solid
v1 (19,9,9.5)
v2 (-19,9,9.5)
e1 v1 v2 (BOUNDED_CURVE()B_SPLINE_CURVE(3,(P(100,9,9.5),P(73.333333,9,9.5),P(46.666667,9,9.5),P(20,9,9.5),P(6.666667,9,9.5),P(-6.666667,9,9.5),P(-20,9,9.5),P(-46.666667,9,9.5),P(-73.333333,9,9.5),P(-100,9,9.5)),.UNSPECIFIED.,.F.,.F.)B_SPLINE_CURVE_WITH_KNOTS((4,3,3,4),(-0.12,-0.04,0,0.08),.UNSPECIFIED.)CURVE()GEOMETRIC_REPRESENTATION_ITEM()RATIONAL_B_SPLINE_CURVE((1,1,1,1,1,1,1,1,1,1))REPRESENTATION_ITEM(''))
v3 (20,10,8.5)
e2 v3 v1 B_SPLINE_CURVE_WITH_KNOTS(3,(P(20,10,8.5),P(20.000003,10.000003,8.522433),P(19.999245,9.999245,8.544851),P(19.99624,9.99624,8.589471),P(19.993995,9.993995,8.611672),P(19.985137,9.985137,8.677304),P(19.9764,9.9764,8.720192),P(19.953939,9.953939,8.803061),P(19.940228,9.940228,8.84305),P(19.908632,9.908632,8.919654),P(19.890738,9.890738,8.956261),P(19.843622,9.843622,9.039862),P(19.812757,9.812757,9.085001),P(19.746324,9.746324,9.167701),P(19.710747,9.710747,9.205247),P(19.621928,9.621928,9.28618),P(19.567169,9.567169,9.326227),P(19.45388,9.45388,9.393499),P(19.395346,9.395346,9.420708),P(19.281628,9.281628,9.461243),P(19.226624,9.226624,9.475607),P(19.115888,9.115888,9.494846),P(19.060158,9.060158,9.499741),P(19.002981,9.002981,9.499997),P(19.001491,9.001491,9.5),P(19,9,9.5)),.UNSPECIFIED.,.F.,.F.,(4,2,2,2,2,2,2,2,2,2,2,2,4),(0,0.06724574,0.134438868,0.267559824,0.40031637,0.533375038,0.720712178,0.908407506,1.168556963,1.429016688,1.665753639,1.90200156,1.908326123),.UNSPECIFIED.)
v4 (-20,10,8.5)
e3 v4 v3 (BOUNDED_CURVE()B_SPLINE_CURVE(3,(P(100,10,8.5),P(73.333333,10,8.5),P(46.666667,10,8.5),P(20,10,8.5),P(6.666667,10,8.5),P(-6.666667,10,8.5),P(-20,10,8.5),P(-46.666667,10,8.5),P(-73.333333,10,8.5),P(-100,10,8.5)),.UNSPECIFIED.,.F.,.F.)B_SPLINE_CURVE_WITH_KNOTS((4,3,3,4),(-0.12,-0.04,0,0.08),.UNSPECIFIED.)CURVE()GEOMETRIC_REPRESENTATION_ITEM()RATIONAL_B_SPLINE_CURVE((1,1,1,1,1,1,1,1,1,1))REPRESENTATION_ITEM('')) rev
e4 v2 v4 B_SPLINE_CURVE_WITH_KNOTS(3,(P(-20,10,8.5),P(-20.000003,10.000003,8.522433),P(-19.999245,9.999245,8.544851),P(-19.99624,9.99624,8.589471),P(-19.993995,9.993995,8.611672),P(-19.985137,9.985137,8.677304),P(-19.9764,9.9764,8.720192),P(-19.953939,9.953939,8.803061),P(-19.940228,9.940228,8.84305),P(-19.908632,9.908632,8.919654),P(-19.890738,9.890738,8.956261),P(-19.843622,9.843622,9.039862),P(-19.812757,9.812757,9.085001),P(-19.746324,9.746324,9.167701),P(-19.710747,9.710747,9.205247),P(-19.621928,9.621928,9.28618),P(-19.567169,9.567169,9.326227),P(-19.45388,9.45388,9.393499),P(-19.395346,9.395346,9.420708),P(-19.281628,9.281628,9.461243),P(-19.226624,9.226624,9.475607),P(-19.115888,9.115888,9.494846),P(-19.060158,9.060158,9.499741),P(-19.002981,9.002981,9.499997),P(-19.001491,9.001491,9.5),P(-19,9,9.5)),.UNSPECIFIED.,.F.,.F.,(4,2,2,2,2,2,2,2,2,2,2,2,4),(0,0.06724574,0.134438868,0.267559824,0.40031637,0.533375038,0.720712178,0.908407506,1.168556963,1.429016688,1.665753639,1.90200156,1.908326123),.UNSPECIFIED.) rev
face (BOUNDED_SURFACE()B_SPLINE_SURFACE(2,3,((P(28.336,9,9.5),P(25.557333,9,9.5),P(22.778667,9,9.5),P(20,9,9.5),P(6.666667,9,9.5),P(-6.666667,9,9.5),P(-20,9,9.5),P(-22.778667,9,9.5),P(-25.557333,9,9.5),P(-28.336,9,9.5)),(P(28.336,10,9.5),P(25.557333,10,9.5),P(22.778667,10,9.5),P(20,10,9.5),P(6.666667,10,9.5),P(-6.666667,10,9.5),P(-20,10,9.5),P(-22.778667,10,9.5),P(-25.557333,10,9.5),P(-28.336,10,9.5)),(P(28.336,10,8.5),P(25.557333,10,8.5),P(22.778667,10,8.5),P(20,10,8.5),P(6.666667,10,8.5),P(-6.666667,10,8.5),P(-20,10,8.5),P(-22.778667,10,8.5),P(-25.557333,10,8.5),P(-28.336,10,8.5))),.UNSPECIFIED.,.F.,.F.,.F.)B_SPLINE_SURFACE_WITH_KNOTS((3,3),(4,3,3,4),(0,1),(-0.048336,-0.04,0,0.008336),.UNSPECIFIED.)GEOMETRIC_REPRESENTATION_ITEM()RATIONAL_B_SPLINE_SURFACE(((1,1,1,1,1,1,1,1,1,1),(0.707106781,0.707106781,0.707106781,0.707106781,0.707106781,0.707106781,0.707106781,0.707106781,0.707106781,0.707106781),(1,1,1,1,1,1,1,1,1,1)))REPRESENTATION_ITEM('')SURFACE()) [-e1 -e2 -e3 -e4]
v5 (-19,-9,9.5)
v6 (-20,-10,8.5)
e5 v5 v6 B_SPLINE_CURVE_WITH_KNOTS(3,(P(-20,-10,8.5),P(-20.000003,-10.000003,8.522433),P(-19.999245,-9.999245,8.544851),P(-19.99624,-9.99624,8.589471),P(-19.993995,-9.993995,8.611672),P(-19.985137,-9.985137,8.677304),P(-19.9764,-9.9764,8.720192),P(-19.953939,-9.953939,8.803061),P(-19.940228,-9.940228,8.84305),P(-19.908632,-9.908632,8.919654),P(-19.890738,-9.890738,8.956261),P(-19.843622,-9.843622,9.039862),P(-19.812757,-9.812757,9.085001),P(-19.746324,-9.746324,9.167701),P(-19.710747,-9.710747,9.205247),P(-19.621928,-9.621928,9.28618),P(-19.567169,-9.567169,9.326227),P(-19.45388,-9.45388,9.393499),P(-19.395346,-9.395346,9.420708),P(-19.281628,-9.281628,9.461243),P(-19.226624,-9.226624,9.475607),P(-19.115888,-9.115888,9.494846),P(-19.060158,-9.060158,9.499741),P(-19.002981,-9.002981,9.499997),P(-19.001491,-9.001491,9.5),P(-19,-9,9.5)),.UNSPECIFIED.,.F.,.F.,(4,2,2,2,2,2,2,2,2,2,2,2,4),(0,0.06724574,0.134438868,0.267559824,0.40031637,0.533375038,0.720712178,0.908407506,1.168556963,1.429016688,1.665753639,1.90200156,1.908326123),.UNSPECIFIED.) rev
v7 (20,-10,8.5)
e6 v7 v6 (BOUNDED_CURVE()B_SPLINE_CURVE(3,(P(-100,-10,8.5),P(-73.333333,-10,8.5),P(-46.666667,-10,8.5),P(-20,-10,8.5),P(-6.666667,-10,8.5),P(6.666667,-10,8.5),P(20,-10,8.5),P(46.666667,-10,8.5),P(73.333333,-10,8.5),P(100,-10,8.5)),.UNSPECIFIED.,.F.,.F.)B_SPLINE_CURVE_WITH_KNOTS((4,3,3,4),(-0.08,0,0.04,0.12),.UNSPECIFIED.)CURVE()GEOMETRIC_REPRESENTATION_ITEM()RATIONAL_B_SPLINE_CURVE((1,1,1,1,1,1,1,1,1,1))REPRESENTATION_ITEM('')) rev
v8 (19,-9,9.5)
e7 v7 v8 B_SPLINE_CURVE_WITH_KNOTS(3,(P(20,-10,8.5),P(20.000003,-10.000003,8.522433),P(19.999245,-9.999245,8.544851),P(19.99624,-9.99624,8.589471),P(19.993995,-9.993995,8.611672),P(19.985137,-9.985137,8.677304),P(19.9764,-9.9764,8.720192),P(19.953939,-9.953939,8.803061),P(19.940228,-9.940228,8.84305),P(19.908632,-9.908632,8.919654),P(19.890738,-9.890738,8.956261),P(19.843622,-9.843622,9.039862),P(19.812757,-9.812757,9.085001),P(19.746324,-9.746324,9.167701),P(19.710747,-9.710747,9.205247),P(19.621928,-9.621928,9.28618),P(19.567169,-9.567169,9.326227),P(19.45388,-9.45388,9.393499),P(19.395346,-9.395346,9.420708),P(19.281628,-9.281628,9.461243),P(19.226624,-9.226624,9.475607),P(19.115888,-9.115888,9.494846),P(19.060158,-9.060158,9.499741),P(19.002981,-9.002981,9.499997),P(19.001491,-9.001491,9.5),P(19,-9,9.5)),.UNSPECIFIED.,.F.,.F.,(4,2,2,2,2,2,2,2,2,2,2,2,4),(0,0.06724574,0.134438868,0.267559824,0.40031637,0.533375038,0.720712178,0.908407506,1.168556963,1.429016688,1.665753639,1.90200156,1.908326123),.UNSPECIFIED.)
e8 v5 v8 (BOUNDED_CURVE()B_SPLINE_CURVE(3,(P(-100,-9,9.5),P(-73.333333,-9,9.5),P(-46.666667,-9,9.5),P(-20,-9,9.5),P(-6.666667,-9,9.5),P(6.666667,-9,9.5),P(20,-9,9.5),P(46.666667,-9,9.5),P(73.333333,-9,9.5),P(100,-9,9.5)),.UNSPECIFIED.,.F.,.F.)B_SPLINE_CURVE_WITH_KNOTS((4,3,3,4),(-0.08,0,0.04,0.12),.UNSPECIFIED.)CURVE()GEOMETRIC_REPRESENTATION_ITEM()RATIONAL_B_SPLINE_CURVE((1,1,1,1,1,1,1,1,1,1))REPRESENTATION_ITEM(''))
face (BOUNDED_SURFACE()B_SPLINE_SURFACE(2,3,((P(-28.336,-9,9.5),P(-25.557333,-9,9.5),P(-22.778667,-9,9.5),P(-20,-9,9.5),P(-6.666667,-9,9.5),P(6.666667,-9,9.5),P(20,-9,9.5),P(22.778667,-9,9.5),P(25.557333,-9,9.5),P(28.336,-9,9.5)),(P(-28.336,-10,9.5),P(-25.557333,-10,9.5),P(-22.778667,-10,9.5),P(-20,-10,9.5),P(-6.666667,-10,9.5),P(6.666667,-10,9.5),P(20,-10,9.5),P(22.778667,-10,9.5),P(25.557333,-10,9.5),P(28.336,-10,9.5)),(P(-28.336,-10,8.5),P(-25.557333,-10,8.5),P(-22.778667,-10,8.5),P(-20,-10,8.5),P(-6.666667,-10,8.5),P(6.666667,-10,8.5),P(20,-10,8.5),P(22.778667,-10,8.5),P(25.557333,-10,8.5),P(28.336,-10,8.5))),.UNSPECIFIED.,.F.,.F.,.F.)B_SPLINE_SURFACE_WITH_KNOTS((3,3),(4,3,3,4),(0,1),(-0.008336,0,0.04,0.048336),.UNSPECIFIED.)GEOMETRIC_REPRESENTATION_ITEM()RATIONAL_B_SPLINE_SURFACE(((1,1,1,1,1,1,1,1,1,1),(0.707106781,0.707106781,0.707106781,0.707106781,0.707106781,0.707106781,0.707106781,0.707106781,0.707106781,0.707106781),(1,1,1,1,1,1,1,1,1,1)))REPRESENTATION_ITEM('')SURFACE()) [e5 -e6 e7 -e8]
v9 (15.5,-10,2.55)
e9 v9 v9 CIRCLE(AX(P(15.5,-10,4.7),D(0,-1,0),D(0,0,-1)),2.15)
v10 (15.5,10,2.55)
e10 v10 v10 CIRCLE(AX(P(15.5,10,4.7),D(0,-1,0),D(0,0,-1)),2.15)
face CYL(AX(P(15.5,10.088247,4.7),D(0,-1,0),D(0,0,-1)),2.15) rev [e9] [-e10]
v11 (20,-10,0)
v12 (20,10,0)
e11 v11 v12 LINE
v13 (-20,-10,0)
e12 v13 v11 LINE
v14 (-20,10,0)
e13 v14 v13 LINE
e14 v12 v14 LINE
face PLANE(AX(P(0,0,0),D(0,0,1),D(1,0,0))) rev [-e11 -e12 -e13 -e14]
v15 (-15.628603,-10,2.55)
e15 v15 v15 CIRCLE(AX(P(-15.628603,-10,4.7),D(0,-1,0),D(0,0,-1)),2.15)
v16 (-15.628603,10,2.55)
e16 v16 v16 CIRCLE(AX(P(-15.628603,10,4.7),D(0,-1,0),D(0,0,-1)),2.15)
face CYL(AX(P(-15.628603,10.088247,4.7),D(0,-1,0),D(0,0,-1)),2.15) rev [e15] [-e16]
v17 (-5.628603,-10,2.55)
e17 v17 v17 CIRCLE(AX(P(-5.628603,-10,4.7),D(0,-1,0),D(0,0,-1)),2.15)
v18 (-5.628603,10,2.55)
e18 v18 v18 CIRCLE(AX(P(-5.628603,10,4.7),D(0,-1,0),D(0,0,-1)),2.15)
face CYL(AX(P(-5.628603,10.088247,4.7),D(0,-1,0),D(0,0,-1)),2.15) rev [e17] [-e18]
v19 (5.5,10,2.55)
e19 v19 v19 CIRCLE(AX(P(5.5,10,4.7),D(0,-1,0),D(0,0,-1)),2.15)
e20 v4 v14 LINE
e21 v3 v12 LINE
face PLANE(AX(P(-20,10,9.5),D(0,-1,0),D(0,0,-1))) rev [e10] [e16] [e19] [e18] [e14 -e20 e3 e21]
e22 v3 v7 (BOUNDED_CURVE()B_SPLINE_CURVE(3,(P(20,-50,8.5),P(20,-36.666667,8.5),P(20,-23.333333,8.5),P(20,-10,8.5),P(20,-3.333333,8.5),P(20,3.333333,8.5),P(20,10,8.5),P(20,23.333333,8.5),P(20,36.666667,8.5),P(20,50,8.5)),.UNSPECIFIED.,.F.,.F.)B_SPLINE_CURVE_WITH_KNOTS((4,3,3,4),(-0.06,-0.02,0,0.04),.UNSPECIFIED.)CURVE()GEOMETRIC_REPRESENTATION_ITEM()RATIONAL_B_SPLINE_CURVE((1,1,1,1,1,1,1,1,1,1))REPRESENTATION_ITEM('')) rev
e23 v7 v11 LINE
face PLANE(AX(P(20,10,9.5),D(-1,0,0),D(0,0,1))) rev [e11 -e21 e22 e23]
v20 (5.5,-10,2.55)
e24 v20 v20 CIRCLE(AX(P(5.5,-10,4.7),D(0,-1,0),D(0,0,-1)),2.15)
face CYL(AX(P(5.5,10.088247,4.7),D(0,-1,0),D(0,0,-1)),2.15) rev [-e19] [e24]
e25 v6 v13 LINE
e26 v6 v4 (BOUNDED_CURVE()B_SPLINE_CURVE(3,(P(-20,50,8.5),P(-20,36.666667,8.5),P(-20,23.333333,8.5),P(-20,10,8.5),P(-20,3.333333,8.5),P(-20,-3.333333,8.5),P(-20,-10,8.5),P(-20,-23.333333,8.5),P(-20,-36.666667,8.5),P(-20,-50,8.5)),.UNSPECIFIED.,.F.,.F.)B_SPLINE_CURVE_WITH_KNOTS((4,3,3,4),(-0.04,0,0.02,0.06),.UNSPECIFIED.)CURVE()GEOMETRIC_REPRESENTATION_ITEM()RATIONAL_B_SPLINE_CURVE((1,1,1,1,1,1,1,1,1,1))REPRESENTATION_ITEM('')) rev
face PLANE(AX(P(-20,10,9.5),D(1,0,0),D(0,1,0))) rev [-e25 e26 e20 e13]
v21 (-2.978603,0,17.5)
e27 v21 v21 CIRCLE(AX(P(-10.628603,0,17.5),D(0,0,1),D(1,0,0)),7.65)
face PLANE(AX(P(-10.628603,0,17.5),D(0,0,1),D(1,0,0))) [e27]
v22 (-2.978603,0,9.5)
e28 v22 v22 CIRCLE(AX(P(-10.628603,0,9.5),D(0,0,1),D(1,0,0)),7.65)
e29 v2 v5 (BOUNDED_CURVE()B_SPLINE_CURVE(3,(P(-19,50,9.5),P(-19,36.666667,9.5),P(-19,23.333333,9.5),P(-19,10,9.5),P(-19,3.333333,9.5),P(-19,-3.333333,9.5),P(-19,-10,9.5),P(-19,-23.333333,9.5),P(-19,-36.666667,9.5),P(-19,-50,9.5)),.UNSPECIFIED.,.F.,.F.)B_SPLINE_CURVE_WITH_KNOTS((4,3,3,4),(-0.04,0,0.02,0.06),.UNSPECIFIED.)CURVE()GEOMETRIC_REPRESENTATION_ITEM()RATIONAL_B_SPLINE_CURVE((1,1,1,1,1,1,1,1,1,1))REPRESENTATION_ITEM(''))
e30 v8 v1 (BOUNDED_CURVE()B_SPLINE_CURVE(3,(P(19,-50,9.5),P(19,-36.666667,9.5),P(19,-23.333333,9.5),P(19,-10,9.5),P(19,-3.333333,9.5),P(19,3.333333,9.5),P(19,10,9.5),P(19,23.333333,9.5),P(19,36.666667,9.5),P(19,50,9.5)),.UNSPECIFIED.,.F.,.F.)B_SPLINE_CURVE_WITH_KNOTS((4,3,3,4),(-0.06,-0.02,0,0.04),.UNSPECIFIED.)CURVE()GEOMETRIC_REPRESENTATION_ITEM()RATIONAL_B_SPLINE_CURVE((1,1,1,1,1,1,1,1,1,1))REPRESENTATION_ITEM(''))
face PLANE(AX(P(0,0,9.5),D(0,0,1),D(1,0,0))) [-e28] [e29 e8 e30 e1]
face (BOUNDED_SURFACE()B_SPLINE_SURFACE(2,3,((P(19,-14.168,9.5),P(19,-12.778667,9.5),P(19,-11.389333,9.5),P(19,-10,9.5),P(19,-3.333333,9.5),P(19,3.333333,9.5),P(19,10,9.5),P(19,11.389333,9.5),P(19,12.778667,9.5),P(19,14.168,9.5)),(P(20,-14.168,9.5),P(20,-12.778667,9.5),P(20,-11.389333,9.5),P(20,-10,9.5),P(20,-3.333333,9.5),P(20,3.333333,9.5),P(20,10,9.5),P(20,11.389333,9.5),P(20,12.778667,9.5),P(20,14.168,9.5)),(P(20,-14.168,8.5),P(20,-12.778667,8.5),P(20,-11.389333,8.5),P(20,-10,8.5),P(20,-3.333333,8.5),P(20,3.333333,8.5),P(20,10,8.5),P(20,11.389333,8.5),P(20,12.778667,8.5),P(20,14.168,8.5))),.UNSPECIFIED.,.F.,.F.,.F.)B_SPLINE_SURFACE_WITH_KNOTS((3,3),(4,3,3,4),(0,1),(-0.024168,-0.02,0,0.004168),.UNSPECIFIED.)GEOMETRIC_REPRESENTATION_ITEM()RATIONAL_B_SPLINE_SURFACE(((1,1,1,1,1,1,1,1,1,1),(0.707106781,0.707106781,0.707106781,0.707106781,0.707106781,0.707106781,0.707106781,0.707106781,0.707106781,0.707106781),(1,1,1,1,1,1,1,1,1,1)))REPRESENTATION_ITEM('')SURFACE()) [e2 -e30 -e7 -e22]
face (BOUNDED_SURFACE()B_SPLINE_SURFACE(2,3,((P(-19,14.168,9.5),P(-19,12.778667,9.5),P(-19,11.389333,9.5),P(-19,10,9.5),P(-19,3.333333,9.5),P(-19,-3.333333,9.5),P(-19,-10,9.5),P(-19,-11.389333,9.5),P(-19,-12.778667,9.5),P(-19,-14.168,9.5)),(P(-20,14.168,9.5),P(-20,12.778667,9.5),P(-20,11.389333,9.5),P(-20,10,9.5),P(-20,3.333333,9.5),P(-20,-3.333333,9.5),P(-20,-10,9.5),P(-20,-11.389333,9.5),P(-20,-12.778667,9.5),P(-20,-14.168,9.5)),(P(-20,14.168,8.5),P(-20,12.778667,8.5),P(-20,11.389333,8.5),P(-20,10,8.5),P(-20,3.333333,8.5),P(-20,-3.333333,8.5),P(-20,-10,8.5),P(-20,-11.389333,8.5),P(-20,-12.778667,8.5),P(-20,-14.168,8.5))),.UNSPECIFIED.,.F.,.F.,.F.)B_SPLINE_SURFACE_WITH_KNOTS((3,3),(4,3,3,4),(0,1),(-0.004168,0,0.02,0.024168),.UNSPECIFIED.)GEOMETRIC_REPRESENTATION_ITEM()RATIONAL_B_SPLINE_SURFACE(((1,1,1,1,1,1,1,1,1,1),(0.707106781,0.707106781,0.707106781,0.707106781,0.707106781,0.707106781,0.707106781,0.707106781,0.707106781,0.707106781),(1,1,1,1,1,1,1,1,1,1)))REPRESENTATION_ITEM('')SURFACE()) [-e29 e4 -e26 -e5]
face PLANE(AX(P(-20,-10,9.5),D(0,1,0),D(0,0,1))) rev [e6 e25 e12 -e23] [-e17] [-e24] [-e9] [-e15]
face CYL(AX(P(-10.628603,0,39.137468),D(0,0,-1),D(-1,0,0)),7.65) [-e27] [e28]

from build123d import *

# Parameters (mm, degrees)
SKETCH1_W           = 40
SKETCH1_H           = 20
BOSS_EXTRUDE1_DEPTH = 9.5
FILLET1_START       = -21
FILLET1_DEPTH       = 41
FILLET1_START_2     = -11
FILLET1_2_DEPTH     = 22
SKETCH4_R           = 7.5
BOSS_EXTRUDE2_DEPTH = 8
SKETCH5_R           = 2.15
CUT_EXTRUDE1_DEPTH  = 34.260336859
SKETCH6_R           = 7.65
BOSS_EXTRUDE3_DEPTH = 8


with BuildPart() as part:
    # Sketch1 → Boss-Extrude1 (new body)
    with BuildSketch(Plane.XY):
        Rectangle(SKETCH1_W, SKETCH1_H)
    extrude(amount=BOSS_EXTRUDE1_DEPTH)

    # Fillet1: read off the stored shape, not the designer's step
    # Fillet1 outline → Fillet1 (cut)
    with BuildSketch(Plane.YZ.offset(FILLET1_START)):
        with BuildLine():
            Line((10, 9.5), (9, 9.5))
            add(Edge.make_bspline(
                [(9, 9.5), (10, 9.5), (10, 8.5)],
                knots=[0, 0, 0, 1, 1, 1], degree=2, weights=[1, 0.707106781, 1]))
            Line((10, 8.5), (10, 9.5))
        make_face()
        with BuildLine():
            add(Edge.make_bspline(
                [(-9, 9.5), (-10, 9.5), (-10, 8.5)],
                knots=[0, 0, 0, 1, 1, 1], degree=2, weights=[1, 0.707106781, 1]))
            Line((-9, 9.5), (-10, 9.5))
            Line((-10, 9.5), (-10, 8.5))
        make_face()
    extrude(amount=FILLET1_DEPTH, mode=Mode.SUBTRACT)

    # Fillet1 2 outline → Fillet1 2 (cut)
    with BuildSketch(Plane(origin=(0, 0, 0), x_dir=(1, 0, 0), z_dir=(0, 1, 0)).offset(FILLET1_START_2)):
        with BuildLine():
            Line((-20, -9.5), (-19, -9.5))
            add(Edge.make_bspline(
                [(-19, -9.5), (-20, -9.5), (-20, -8.5)],
                knots=[0, 0, 0, 1, 1, 1], degree=2, weights=[1, 0.707106781, 1]))
            Line((-20, -8.5), (-20, -9.5))
        make_face()
        with BuildLine():
            add(Edge.make_bspline(
                [(19, -9.5), (20, -9.5), (20, -8.5)],
                knots=[0, 0, 0, 1, 1, 1], degree=2, weights=[1, 0.707106781, 1]))
            Line((19, -9.5), (20, -9.5))
            Line((20, -9.5), (20, -8.5))
        make_face()
    extrude(amount=FILLET1_2_DEPTH, mode=Mode.SUBTRACT)

    # Sketch4 → Boss-Extrude2 (add)
    with BuildSketch(Plane.XY.offset(9.5)):
        with Locations((-10.628602575, 0)):
            Circle(SKETCH4_R)
    extrude(amount=BOSS_EXTRUDE2_DEPTH)

    # Sketch5 → Cut-Extrude1 (cut, through all)
    with BuildSketch(Plane.XZ.offset(10)):
        with Locations(Location((-15.628602575, 4.7, 0), (0, 0, 270))):
            Circle(SKETCH5_R)
        with Locations(Location((-5.628602575, 4.7, 0), (0, 0, 270))):
            Circle(SKETCH5_R)
        with Locations(Location((5.5, 4.7, 0), (0, 0, 270))):
            Circle(SKETCH5_R)
        with Locations(Location((15.5, 4.7, 0), (0, 0, 270))):
            Circle(SKETCH5_R)
    extrude(amount=-CUT_EXTRUDE1_DEPTH, mode=Mode.SUBTRACT)

    # Sketch6 → Boss-Extrude3 (add)
    with BuildSketch(Plane.XY.offset(9.5)):
        with Locations((-10.628602575, 0)):
            Circle(SKETCH6_R)
    extrude(amount=BOSS_EXTRUDE3_DEPTH)


solid = part.part
